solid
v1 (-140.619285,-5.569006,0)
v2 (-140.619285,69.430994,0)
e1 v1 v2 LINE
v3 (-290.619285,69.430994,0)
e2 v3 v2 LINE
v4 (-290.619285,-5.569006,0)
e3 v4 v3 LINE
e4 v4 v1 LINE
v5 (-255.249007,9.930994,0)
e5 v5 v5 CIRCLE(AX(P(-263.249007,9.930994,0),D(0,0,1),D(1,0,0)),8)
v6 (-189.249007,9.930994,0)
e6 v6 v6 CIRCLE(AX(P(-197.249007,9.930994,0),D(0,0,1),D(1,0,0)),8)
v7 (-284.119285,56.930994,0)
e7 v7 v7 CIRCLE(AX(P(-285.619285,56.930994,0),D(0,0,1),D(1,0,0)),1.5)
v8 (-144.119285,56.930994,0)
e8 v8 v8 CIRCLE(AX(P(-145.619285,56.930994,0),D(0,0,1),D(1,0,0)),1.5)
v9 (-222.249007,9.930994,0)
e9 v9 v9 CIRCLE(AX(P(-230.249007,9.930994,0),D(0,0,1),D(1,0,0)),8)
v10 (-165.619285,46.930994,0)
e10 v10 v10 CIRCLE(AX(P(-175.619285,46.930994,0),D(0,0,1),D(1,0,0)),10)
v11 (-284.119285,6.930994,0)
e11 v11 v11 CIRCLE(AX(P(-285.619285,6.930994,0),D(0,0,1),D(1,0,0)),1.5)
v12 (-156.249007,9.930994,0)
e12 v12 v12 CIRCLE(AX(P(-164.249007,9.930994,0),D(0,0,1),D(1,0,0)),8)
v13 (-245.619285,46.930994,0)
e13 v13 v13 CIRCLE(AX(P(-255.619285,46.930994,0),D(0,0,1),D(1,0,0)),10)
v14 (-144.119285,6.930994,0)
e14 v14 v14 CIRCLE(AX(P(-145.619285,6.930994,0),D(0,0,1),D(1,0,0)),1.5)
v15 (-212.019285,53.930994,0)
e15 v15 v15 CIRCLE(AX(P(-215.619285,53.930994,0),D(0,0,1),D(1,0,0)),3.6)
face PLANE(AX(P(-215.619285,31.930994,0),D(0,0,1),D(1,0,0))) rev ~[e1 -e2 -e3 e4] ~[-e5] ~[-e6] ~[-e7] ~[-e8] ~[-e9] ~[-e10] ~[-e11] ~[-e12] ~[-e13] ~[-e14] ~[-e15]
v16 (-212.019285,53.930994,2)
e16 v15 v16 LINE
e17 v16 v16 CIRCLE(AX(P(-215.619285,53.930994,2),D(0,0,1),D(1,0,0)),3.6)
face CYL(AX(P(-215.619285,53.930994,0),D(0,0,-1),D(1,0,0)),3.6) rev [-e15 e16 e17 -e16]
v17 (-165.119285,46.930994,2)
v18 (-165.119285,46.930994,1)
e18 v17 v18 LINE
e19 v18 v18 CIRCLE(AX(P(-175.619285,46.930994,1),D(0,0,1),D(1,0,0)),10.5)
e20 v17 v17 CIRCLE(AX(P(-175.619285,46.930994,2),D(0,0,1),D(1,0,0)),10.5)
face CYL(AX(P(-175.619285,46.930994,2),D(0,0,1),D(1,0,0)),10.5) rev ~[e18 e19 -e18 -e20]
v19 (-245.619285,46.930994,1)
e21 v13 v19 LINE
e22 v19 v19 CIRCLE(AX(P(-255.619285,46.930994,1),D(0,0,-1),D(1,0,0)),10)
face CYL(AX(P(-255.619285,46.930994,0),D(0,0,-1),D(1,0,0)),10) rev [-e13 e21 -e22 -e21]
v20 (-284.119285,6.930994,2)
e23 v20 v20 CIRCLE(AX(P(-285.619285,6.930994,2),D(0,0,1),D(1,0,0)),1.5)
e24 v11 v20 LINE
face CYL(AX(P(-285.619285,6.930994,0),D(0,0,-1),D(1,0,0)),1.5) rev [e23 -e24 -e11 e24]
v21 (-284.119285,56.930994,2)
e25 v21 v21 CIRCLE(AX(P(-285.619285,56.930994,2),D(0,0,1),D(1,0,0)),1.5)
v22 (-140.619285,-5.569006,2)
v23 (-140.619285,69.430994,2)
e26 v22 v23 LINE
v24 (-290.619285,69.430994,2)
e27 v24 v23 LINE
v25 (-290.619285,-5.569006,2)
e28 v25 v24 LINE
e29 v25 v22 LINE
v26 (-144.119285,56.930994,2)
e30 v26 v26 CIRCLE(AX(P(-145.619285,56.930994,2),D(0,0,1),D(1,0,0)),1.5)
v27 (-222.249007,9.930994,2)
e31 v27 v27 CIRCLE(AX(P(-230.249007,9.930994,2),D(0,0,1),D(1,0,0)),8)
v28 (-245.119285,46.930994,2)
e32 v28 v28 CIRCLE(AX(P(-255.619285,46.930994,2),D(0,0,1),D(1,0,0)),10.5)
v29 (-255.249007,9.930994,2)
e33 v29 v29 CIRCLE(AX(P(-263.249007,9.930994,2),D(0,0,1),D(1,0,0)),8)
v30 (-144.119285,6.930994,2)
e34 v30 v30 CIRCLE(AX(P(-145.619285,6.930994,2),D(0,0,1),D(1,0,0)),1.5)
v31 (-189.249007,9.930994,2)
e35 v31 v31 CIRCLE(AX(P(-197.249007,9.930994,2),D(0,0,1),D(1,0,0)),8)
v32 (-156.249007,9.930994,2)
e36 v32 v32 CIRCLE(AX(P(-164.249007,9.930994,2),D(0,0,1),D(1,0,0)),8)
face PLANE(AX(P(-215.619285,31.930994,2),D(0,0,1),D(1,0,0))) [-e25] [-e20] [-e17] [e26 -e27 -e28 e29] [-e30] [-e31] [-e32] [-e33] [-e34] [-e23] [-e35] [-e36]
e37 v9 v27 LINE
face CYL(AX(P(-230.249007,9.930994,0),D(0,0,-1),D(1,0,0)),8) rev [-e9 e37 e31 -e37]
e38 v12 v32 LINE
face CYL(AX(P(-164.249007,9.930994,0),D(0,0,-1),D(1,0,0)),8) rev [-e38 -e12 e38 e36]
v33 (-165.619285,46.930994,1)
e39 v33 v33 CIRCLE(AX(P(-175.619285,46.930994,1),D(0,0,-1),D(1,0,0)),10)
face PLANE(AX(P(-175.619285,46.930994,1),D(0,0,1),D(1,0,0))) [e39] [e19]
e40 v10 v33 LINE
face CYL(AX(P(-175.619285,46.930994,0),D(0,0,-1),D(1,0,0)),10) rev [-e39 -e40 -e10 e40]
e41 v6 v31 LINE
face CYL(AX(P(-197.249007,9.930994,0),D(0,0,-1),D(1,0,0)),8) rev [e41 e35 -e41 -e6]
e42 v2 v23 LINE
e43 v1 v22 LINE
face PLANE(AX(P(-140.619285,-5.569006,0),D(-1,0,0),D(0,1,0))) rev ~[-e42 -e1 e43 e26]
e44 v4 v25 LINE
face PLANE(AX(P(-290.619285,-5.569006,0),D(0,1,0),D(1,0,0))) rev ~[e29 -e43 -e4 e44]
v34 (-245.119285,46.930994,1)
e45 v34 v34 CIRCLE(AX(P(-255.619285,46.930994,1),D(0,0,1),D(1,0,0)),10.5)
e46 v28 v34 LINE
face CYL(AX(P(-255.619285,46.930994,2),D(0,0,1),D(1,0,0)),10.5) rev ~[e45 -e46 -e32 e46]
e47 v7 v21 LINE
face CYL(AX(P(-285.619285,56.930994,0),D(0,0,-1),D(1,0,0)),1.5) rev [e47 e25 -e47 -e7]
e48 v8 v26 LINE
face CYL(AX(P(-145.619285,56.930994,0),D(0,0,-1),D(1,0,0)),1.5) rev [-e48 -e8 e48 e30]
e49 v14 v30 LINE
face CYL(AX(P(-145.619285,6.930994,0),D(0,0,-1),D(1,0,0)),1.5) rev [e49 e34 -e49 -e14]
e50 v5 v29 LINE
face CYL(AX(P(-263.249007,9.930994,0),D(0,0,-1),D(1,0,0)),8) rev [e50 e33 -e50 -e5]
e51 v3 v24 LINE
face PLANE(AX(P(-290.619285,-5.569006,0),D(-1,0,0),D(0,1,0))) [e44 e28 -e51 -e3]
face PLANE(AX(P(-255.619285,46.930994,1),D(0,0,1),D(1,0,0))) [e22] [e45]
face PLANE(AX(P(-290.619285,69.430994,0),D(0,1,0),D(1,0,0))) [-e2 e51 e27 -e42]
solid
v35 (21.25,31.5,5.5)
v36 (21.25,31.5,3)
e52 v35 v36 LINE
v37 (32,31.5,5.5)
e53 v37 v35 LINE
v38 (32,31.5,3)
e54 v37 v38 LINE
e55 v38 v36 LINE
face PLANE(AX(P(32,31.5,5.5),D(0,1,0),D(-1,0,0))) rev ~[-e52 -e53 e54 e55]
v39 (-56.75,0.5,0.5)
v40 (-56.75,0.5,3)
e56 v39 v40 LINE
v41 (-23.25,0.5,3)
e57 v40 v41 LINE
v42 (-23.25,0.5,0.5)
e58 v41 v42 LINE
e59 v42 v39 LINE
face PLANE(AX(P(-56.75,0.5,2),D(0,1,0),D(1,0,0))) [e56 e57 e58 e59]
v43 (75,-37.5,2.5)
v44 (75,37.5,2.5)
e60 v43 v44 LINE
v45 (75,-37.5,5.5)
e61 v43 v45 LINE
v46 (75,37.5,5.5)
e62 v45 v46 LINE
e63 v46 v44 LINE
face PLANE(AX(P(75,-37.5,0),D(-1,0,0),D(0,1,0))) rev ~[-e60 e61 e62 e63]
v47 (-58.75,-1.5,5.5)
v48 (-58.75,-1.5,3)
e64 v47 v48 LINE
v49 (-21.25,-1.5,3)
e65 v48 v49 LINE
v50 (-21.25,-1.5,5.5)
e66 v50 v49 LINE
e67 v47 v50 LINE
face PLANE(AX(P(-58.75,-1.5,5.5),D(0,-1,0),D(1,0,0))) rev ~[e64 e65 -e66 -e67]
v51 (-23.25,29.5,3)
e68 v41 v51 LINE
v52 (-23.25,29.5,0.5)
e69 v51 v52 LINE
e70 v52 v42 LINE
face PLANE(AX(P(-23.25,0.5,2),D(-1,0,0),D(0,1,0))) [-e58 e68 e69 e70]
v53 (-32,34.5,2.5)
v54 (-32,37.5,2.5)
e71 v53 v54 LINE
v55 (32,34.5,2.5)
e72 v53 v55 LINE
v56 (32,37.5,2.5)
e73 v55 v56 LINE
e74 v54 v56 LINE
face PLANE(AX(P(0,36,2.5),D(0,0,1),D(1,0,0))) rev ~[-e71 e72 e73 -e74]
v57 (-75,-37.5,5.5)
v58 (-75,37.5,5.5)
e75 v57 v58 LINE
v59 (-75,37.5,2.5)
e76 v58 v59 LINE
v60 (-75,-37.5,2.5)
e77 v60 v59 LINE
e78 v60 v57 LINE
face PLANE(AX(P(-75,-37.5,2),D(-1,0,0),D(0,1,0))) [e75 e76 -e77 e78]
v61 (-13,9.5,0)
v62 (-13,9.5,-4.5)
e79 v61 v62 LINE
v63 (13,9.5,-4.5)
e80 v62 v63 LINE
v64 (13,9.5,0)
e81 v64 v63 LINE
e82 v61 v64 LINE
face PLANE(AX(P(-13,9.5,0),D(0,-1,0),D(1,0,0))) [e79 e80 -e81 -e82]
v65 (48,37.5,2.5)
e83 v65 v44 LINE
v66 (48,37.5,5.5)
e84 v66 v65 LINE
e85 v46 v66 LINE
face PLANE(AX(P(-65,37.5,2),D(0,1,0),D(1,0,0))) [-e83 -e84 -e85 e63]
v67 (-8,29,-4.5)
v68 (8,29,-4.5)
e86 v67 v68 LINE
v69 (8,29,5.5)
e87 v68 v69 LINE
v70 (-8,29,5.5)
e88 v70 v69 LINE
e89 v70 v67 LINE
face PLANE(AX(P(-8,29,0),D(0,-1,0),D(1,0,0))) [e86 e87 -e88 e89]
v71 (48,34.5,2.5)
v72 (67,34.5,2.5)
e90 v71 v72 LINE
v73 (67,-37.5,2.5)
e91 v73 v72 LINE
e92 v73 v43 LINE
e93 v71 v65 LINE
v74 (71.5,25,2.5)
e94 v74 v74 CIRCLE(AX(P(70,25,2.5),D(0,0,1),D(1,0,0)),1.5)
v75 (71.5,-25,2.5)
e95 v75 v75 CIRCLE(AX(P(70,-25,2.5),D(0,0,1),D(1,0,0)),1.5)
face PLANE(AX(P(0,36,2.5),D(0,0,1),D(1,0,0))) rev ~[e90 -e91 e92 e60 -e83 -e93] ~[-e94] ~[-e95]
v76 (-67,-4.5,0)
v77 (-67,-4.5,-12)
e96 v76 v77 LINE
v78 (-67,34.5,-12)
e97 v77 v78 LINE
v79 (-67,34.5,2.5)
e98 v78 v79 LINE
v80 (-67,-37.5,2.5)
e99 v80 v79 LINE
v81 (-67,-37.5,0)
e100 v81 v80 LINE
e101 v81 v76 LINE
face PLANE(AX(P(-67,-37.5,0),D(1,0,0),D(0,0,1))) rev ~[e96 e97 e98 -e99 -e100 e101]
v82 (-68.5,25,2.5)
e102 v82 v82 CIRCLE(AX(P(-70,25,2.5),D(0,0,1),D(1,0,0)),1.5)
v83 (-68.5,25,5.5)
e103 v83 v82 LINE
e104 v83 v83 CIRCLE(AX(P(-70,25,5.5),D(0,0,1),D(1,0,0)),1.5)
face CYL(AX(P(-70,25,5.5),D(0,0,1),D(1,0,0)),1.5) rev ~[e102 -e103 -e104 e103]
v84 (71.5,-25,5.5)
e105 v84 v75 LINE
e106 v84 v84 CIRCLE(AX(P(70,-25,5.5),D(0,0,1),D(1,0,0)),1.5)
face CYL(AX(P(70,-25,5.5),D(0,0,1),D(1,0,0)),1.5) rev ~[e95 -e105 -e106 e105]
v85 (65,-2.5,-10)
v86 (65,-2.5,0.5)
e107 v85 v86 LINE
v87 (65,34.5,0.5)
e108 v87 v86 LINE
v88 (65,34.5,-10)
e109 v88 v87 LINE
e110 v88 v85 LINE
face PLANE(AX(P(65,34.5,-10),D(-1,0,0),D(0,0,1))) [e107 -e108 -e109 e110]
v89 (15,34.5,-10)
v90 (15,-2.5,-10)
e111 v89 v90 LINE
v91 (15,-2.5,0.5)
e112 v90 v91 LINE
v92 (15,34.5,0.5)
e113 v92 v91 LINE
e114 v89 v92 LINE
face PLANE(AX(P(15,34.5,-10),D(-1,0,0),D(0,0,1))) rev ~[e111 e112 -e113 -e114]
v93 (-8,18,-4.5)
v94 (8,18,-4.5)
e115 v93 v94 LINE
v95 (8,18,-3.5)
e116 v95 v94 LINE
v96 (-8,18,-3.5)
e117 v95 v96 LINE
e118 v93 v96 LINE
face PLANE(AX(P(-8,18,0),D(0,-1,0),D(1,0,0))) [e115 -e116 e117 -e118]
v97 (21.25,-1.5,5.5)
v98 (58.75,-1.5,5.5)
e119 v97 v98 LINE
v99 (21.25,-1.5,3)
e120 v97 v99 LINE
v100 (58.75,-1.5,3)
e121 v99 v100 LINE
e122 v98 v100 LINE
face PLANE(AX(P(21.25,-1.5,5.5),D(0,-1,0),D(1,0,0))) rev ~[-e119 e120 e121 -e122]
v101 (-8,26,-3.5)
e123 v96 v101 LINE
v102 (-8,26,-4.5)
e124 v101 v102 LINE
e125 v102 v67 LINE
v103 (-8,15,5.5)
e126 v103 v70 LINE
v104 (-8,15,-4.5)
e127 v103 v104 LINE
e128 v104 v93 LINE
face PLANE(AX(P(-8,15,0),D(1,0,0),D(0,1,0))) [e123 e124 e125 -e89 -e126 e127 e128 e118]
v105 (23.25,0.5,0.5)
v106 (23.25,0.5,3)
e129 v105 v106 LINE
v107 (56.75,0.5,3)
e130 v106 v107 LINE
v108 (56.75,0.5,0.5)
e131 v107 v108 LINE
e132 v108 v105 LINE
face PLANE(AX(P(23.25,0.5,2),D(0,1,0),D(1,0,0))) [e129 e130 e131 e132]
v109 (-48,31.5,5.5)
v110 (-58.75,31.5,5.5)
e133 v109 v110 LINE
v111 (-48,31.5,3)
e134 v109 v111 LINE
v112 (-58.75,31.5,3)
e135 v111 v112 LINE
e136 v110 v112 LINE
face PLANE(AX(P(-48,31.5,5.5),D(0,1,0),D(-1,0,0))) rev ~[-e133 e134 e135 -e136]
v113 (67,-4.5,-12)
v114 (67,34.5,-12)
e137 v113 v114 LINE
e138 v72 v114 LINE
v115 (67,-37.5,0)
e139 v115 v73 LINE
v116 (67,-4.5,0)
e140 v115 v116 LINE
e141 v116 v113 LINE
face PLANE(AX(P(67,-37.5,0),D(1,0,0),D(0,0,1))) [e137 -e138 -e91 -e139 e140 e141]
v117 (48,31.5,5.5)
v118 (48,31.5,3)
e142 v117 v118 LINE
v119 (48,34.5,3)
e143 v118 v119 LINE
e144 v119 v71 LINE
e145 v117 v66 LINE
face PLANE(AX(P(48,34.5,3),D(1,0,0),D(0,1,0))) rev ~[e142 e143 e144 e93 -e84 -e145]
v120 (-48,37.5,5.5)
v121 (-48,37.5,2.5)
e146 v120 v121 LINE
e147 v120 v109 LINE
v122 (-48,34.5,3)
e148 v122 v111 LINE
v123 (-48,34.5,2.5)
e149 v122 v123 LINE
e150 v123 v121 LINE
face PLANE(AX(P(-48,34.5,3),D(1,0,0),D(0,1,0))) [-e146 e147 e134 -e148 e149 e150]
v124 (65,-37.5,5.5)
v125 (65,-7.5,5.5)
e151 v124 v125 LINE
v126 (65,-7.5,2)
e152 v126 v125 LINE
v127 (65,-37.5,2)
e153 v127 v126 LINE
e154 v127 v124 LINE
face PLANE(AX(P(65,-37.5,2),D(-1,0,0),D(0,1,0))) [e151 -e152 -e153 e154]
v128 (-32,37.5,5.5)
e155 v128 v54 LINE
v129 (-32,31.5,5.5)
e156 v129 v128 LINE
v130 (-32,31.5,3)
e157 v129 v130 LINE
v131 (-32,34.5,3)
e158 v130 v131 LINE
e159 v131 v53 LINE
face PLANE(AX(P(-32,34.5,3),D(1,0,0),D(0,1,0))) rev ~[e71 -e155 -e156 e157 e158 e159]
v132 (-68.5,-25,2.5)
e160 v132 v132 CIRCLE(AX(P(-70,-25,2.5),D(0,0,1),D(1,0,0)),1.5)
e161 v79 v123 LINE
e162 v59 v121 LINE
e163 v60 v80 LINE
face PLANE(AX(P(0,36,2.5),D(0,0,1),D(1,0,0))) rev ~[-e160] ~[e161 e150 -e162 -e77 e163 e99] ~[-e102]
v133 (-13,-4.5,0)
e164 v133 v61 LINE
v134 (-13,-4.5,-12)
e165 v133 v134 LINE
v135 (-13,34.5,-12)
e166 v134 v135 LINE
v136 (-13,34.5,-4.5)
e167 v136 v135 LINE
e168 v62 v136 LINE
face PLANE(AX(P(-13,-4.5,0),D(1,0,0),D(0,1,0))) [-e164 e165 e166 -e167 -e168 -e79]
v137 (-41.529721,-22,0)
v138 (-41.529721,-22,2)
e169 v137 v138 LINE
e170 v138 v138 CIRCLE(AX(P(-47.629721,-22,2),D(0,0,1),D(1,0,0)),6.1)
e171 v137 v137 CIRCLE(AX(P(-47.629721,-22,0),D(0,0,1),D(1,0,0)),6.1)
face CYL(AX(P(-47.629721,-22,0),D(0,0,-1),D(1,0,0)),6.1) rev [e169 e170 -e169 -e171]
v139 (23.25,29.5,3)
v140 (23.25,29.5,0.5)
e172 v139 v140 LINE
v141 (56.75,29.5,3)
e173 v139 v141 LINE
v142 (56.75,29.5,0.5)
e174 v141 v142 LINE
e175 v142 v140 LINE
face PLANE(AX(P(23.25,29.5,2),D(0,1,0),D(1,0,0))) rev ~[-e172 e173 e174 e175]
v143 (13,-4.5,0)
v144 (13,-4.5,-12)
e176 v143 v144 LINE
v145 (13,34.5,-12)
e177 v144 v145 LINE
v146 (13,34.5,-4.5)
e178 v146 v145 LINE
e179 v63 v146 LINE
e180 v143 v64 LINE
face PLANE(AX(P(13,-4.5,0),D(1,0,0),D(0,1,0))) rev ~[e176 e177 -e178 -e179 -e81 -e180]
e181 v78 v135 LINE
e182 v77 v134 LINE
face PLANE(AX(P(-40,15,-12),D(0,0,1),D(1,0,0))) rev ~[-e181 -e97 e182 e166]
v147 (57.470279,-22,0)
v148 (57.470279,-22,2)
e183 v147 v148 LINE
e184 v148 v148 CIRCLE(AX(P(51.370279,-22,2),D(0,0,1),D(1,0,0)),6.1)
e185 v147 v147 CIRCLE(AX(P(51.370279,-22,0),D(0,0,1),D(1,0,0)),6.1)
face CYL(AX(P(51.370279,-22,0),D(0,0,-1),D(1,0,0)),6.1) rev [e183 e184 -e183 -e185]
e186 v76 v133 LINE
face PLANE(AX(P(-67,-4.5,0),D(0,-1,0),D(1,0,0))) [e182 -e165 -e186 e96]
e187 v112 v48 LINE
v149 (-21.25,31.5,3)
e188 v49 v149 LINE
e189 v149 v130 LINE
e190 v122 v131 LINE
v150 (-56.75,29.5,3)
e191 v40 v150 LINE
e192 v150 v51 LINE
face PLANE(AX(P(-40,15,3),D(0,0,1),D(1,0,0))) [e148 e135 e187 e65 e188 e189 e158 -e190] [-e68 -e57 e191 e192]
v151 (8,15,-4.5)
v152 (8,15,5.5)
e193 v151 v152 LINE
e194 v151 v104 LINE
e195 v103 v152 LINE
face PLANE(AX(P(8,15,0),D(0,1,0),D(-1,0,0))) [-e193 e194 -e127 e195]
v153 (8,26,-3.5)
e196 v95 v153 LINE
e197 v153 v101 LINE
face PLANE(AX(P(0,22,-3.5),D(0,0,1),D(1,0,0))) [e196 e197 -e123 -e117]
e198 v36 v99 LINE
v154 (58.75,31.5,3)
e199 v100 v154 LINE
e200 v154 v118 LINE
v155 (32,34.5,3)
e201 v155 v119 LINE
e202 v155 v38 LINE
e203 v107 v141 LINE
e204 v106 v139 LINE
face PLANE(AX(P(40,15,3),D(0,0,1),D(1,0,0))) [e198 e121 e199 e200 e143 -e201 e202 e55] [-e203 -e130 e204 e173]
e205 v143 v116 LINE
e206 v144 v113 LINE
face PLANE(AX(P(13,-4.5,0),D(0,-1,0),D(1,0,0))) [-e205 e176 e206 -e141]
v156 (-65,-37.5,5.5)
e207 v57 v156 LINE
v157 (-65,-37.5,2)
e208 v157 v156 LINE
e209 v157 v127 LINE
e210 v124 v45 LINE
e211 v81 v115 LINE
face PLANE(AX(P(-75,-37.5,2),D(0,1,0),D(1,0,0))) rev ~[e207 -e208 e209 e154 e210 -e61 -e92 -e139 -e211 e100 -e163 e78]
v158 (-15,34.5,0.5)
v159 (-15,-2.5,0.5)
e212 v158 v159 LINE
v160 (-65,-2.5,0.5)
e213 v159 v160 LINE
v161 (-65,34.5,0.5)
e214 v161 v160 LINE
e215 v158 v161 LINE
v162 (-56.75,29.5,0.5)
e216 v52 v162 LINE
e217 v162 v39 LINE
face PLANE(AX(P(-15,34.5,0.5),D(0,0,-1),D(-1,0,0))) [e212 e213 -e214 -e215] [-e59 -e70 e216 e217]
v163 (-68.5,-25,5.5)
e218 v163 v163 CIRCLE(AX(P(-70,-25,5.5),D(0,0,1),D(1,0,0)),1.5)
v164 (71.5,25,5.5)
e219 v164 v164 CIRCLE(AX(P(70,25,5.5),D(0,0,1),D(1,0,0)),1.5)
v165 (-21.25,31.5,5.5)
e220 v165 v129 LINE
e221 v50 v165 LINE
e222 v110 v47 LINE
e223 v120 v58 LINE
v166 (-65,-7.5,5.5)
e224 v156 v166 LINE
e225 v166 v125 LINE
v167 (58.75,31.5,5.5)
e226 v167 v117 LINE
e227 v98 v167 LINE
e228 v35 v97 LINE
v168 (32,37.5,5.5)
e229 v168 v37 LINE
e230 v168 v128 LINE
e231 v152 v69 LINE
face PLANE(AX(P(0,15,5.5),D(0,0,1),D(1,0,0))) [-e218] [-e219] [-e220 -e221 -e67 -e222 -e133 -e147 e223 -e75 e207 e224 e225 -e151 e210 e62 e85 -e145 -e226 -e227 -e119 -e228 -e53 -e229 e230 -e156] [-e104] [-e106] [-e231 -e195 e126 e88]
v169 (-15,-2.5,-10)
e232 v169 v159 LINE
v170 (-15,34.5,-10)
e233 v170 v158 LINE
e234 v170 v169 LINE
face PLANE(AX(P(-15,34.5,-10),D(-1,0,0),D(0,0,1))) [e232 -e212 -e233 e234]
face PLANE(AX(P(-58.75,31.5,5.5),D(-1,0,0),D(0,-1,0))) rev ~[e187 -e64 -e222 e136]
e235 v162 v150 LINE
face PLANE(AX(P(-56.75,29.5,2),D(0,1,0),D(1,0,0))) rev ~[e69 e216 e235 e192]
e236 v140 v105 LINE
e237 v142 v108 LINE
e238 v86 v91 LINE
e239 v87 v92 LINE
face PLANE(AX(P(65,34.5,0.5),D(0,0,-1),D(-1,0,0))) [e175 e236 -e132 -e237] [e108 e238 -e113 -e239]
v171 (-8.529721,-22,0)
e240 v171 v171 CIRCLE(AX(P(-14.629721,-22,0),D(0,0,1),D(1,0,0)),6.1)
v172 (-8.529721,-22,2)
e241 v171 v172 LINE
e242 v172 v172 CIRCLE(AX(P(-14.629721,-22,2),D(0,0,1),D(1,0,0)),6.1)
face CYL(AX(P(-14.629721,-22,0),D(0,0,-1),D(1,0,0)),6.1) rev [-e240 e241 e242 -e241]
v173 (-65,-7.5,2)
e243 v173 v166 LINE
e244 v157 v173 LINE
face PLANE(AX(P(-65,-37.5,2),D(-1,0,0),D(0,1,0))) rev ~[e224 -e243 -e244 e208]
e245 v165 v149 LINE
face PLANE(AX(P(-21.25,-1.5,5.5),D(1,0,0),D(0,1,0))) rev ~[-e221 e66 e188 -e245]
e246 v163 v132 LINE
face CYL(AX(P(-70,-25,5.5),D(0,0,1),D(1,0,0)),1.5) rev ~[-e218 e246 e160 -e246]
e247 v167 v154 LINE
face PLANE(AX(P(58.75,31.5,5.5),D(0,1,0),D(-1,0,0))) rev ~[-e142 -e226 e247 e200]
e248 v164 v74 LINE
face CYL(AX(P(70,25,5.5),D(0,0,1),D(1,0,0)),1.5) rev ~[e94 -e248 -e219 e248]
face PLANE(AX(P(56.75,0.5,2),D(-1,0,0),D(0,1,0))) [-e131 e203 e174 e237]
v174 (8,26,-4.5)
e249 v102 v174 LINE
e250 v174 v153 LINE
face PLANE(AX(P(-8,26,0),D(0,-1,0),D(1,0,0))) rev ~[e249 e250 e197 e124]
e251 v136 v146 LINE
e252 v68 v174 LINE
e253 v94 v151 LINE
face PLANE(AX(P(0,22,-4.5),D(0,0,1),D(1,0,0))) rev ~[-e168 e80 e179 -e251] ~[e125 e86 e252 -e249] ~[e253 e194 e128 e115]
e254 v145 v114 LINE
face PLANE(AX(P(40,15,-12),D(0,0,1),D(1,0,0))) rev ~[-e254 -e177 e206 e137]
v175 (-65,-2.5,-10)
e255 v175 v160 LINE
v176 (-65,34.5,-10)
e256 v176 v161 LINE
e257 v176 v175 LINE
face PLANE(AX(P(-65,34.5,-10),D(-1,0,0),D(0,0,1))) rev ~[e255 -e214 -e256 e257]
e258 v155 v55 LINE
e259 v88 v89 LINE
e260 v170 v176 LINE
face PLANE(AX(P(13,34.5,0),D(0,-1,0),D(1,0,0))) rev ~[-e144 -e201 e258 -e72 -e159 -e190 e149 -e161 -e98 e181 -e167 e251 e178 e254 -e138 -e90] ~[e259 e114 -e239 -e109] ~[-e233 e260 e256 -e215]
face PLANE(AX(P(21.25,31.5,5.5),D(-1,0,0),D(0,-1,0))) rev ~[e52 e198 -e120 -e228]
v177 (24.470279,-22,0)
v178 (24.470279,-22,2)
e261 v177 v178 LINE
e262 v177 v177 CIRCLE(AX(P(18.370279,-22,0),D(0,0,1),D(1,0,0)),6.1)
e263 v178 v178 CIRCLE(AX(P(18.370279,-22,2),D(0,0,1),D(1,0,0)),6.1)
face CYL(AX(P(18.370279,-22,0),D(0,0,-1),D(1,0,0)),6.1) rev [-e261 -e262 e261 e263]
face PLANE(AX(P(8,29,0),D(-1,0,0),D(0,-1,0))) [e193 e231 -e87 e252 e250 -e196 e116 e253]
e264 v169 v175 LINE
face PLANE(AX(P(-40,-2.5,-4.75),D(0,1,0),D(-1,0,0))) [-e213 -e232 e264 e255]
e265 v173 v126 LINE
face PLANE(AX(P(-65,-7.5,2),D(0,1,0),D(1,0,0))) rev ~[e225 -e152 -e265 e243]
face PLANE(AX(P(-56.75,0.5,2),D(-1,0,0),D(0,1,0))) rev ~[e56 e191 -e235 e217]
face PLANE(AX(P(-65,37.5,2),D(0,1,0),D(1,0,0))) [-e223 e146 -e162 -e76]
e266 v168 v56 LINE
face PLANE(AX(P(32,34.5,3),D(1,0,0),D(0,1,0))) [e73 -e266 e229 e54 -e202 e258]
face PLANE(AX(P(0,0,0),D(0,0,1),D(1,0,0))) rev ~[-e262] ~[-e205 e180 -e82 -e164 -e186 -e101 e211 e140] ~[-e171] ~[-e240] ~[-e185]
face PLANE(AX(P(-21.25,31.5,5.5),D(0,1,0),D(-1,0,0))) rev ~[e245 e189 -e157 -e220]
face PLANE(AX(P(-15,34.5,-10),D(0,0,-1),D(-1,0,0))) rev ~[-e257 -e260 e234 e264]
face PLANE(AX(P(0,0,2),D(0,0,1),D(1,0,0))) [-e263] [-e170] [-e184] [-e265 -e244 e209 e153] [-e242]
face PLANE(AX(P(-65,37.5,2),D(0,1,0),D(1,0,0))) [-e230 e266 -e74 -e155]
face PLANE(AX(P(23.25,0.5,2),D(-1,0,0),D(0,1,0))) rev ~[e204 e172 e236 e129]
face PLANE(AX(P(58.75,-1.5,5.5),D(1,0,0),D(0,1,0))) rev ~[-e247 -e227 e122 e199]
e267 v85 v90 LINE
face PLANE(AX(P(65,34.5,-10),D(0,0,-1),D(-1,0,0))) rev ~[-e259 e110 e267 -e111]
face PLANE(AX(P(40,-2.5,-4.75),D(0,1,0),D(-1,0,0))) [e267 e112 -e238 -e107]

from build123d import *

# Parameters (mm, degrees)
F0_W      = 150
F0_H      = 75
F0_R      = 1.5
F0_R_2    = 6.1
F0_W_2    = 33.5
F0_H_2    = 29
F0_W_3    = 16
F0_H_3    = 8
F1_DEPTH  = 2
F2_W      = 10
F2_H      = 75
F3_DEPTH  = 3.5
F4_W      = 8
F4_H      = 2.5
F5_DEPTH  = 80
F6_W      = 130
F6_H      = 45
F6_W_2    = 33.5
F6_H_2    = 29
F6_W_3    = 16
F6_H_3    = 14
F7_DEPTH  = 3.5
F8_W      = 33.5
F8_H      = 29
F8_W_2    = 16
F8_H_2    = 9
F8_H_3    = 6
F9_DEPTH  = 2.5
F10_W     = 150
F10_H     = 75
F10_R     = 1.5
F10_R_2   = 8
F10_R_3   = 10
F10_R_4   = 3.6
F11_DEPTH = 2
F12_R     = 10.5
F13_DEPTH = 1
F14_W     = 26
F14_H     = 25
F15_DEPTH = 4.5
F16_W     = 16
F16_H     = 14
F17_DEPTH = 9
F18_W     = 134
F18_H     = 3
F19_DEPTH = 2.5
F20_W     = 54
F20_H     = 39
F20_W_2   = 33.5
F20_H_2   = 29
F21_DEPTH = 12
F22_W     = 50
F22_H     = 10.5
F23_DEPTH = 37
F24_R     = 1.5
F25_DEPTH = 25
F26_W     = 16
F26_H     = 3
F27_DEPTH = 3


# Not quite as in the source:
# - a feature names something its author has since deleted; it is built from what else it names


with BuildPart() as f1:
    # F0 (on Top) → F1 (new body)
    with BuildSketch(Plane.XY):
        Rectangle(F0_W, F0_H)
        with Locations((-70, -25)):
            Circle(F0_R, mode=Mode.SUBTRACT)
        with Locations((-47.6297214627, -22)):
            Circle(F0_R_2, mode=Mode.SUBTRACT)
        with Locations((-14.6297214627, -22)):
            Circle(F0_R_2, mode=Mode.SUBTRACT)
        with Locations((18.3702785373, -22)):
            Circle(F0_R_2, mode=Mode.SUBTRACT)
        with Locations((51.3702785373, -22)):
            Circle(F0_R_2, mode=Mode.SUBTRACT)
        with Locations((70, -25)):
            Circle(F0_R, mode=Mode.SUBTRACT)
        with Locations((-40, 15)):
            Rectangle(F0_W_2, F0_H_2, mode=Mode.SUBTRACT)
        with Locations((-70, 25)):
            Circle(F0_R, mode=Mode.SUBTRACT)
        with Locations((40, 15)):
            Rectangle(F0_W_2, F0_H_2, mode=Mode.SUBTRACT)
        Polygon((8, 18), (8, 15), (-8, 15), (-8, 18), (-8, 26), (-8, 29), (8, 29), (8, 26), align=None, mode=Mode.SUBTRACT)
        with Locations((70, 25)):
            Circle(F0_R, mode=Mode.SUBTRACT)
        with Locations((0, 22)):
            Rectangle(F0_W_3, F0_H_3)
    extrude(amount=F1_DEPTH)

    # F2 (on face) → F3 (join)
    with BuildSketch(Plane.XY.offset(2)):
        with Locations((-70, 0)):
            Rectangle(F2_W, F2_H)
        with Locations((70, 0)):
            Rectangle(F2_W, F2_H)
    extrude(amount=F3_DEPTH)

    # F4 (on face) → F5 (cut)
    with BuildSketch(Plane.XZ.offset(37.5)):
        with Locations((-71, 1.25)):
            Rectangle(F4_W, F4_H)
        with Locations((71, 1.25)):
            Rectangle(F4_W, F4_H)
    extrude(amount=-F5_DEPTH, mode=Mode.SUBTRACT)

    # F6 (on face) → F7 (join)
    with BuildSketch(Plane.XY.offset(2)):
        with Locations((0, 15)):
            Rectangle(F6_W, F6_H)
        with Locations((-40, 15)):
            Rectangle(F6_W_2, F6_H_2, mode=Mode.SUBTRACT)
        with Locations((0, 22)):
            Rectangle(F6_W_3, F6_H_3, mode=Mode.SUBTRACT)
        with Locations((40, 15)):
            Rectangle(F6_W_2, F6_H_2, mode=Mode.SUBTRACT)
    extrude(amount=F7_DEPTH)

    # F8 (on face) → F9 (cut)
    with BuildSketch(Plane.XY.offset(5.5)):
        Polygon((-58.75, -1.5), (-21.25, -1.5), (-21.25, 31.5), (-32, 31.5), (-48, 31.5), (-58.75, 31.5), align=None)
        with Locations((-40, 15)):
            Rectangle(F8_W, F8_H, mode=Mode.SUBTRACT)
        Polygon((48, 31.5), (32, 31.5), (21.25, 31.5), (21.25, -1.5), (58.75, -1.5), (58.75, 31.5), align=None)
        with Locations((40, 15)):
            Rectangle(F8_W, F8_H, mode=Mode.SUBTRACT)
        with Locations((-40, 42)):
            Rectangle(F8_W_2, F8_H_2)
        with Locations((40, 42)):
            Rectangle(F8_W_2, F8_H_2)
        with Locations((-40, 34.5)):
            Rectangle(F8_W_2, F8_H_3)
        with Locations((40, 34.5)):
            Rectangle(F8_W_2, F8_H_3)
    extrude(amount=-F9_DEPTH, mode=Mode.SUBTRACT)

    # F14 (on face) + F0 (on Top) → F15 (join)
    with BuildSketch(Plane.XY):
        with Locations((0, 22)):
            Rectangle(F14_W, F14_H)
        Polygon((8, 29), (8, 26), (8, 18), (8, 15), (-8, 15), (-8, 18), (-8, 26), (-8, 29), align=None, mode=Mode.SUBTRACT)
    with BuildSketch(Plane.XY):
        with Locations((0, 22)):
            Rectangle(F0_W_3, F0_H_3)
    extrude(amount=-F15_DEPTH)

    # F16 (on face) → F17 (cut)
    with BuildSketch(Plane.XY.offset(5.5)):
        with Locations((0, 22)):
            Rectangle(F16_W, F16_H)
    extrude(amount=-F17_DEPTH, mode=Mode.SUBTRACT)

    # F18 (on face) → F19 (cut)
    with BuildSketch(Plane.XY):
        with Locations((0, 36)):
            Rectangle(F18_W, F18_H)
    extrude(amount=F19_DEPTH, mode=Mode.SUBTRACT)

    # F20 (on face) → F21 (join)
    with BuildSketch(Plane.XY):
        with Locations((40, 15)):
            Rectangle(F20_W, F20_H)
        with Locations((40, 15)):
            Rectangle(F20_W_2, F20_H_2, mode=Mode.SUBTRACT)
        with Locations((-40, 15)):
            Rectangle(F20_W, F20_H)
        with Locations((-40, 15)):
            Rectangle(F20_W_2, F20_H_2, mode=Mode.SUBTRACT)
        with Locations((40, 15)):
            Rectangle(F20_W_2, F20_H_2)
        with Locations((-40, 15)):
            Rectangle(F20_W_2, F20_H_2)
    extrude(amount=-F21_DEPTH)

    # F22 (on face) → F23 (cut)
    with BuildSketch(Plane(origin=(0, 34.5, 0), x_dir=(-1, 0, 0), z_dir=(0, 1, 0))):
        with Locations((-40, -4.75)):
            Rectangle(F22_W, F22_H)
        with Locations((40, -4.75)):
            Rectangle(F22_W, F22_H)
    extrude(amount=-F23_DEPTH, mode=Mode.SUBTRACT)

    # F24 (on face) → F25 (cut)
    with BuildSketch(Plane.XY.offset(5.5)):
        with Locations((-70, 25)):
            Circle(F24_R)
        with Locations((-70, -25)):
            Circle(F24_R)
        with Locations((70, 25)):
            Circle(F24_R)
        with Locations((70, -25)):
            Circle(F24_R)
    extrude(amount=-F25_DEPTH, mode=Mode.SUBTRACT)

    # F26 (on face) → F27 (cut)
    with BuildSketch(Plane.XY.offset(3)):
        with Locations((-40, 36)):
            Rectangle(F26_W, F26_H)
        with Locations((40, 36)):
            Rectangle(F26_W, F26_H)
    extrude(amount=-F27_DEPTH, mode=Mode.SUBTRACT)


with BuildPart() as f11:
    # F10 (on Top) → F11 (new body)
    with BuildSketch(Plane.XY):
        with Locations((-215.6192851201, 31.9309936473)):
            Rectangle(F10_W, F10_H)
        with Locations((-285.6192851201, 6.9309936473)):
            Circle(F10_R, mode=Mode.SUBTRACT)
        with Locations((-263.2490065828, 9.9309936473)):
            Circle(F10_R_2, mode=Mode.SUBTRACT)
        with Locations((-230.2490065828, 9.9309936473)):
            Circle(F10_R_2, mode=Mode.SUBTRACT)
        with Locations((-197.2490065828, 9.9309936473)):
            Circle(F10_R_2, mode=Mode.SUBTRACT)
        with Locations((-164.2490065828, 9.9309936473)):
            Circle(F10_R_2, mode=Mode.SUBTRACT)
        with Locations((-145.6192851201, 6.9309936473)):
            Circle(F10_R, mode=Mode.SUBTRACT)
        with Locations((-255.6192851201, 46.9309936473)):
            Circle(F10_R_3, mode=Mode.SUBTRACT)
        with Locations((-285.6192851201, 56.9309936473)):
            Circle(F10_R, mode=Mode.SUBTRACT)
        with Locations((-175.6192851201, 46.9309936473)):
            Circle(F10_R_3, mode=Mode.SUBTRACT)
        with Locations((-215.6192851201, 53.9309936473)):
            Circle(F10_R_4, mode=Mode.SUBTRACT)
        with Locations((-145.6192851201, 56.9309936473)):
            Circle(F10_R, mode=Mode.SUBTRACT)
    extrude(amount=F11_DEPTH)

    # F12 (on face) → F13 (cut)
    with BuildSketch(Plane.XY.offset(2)):
        with Locations((-255.6192851201, 46.9309936473)):
            Circle(F12_R)
        with Locations((-175.6192851201, 46.9309936473)):
            Circle(F12_R)
    extrude(amount=-F13_DEPTH, mode=Mode.SUBTRACT)


solid = Compound([f1.part, f11.part])
